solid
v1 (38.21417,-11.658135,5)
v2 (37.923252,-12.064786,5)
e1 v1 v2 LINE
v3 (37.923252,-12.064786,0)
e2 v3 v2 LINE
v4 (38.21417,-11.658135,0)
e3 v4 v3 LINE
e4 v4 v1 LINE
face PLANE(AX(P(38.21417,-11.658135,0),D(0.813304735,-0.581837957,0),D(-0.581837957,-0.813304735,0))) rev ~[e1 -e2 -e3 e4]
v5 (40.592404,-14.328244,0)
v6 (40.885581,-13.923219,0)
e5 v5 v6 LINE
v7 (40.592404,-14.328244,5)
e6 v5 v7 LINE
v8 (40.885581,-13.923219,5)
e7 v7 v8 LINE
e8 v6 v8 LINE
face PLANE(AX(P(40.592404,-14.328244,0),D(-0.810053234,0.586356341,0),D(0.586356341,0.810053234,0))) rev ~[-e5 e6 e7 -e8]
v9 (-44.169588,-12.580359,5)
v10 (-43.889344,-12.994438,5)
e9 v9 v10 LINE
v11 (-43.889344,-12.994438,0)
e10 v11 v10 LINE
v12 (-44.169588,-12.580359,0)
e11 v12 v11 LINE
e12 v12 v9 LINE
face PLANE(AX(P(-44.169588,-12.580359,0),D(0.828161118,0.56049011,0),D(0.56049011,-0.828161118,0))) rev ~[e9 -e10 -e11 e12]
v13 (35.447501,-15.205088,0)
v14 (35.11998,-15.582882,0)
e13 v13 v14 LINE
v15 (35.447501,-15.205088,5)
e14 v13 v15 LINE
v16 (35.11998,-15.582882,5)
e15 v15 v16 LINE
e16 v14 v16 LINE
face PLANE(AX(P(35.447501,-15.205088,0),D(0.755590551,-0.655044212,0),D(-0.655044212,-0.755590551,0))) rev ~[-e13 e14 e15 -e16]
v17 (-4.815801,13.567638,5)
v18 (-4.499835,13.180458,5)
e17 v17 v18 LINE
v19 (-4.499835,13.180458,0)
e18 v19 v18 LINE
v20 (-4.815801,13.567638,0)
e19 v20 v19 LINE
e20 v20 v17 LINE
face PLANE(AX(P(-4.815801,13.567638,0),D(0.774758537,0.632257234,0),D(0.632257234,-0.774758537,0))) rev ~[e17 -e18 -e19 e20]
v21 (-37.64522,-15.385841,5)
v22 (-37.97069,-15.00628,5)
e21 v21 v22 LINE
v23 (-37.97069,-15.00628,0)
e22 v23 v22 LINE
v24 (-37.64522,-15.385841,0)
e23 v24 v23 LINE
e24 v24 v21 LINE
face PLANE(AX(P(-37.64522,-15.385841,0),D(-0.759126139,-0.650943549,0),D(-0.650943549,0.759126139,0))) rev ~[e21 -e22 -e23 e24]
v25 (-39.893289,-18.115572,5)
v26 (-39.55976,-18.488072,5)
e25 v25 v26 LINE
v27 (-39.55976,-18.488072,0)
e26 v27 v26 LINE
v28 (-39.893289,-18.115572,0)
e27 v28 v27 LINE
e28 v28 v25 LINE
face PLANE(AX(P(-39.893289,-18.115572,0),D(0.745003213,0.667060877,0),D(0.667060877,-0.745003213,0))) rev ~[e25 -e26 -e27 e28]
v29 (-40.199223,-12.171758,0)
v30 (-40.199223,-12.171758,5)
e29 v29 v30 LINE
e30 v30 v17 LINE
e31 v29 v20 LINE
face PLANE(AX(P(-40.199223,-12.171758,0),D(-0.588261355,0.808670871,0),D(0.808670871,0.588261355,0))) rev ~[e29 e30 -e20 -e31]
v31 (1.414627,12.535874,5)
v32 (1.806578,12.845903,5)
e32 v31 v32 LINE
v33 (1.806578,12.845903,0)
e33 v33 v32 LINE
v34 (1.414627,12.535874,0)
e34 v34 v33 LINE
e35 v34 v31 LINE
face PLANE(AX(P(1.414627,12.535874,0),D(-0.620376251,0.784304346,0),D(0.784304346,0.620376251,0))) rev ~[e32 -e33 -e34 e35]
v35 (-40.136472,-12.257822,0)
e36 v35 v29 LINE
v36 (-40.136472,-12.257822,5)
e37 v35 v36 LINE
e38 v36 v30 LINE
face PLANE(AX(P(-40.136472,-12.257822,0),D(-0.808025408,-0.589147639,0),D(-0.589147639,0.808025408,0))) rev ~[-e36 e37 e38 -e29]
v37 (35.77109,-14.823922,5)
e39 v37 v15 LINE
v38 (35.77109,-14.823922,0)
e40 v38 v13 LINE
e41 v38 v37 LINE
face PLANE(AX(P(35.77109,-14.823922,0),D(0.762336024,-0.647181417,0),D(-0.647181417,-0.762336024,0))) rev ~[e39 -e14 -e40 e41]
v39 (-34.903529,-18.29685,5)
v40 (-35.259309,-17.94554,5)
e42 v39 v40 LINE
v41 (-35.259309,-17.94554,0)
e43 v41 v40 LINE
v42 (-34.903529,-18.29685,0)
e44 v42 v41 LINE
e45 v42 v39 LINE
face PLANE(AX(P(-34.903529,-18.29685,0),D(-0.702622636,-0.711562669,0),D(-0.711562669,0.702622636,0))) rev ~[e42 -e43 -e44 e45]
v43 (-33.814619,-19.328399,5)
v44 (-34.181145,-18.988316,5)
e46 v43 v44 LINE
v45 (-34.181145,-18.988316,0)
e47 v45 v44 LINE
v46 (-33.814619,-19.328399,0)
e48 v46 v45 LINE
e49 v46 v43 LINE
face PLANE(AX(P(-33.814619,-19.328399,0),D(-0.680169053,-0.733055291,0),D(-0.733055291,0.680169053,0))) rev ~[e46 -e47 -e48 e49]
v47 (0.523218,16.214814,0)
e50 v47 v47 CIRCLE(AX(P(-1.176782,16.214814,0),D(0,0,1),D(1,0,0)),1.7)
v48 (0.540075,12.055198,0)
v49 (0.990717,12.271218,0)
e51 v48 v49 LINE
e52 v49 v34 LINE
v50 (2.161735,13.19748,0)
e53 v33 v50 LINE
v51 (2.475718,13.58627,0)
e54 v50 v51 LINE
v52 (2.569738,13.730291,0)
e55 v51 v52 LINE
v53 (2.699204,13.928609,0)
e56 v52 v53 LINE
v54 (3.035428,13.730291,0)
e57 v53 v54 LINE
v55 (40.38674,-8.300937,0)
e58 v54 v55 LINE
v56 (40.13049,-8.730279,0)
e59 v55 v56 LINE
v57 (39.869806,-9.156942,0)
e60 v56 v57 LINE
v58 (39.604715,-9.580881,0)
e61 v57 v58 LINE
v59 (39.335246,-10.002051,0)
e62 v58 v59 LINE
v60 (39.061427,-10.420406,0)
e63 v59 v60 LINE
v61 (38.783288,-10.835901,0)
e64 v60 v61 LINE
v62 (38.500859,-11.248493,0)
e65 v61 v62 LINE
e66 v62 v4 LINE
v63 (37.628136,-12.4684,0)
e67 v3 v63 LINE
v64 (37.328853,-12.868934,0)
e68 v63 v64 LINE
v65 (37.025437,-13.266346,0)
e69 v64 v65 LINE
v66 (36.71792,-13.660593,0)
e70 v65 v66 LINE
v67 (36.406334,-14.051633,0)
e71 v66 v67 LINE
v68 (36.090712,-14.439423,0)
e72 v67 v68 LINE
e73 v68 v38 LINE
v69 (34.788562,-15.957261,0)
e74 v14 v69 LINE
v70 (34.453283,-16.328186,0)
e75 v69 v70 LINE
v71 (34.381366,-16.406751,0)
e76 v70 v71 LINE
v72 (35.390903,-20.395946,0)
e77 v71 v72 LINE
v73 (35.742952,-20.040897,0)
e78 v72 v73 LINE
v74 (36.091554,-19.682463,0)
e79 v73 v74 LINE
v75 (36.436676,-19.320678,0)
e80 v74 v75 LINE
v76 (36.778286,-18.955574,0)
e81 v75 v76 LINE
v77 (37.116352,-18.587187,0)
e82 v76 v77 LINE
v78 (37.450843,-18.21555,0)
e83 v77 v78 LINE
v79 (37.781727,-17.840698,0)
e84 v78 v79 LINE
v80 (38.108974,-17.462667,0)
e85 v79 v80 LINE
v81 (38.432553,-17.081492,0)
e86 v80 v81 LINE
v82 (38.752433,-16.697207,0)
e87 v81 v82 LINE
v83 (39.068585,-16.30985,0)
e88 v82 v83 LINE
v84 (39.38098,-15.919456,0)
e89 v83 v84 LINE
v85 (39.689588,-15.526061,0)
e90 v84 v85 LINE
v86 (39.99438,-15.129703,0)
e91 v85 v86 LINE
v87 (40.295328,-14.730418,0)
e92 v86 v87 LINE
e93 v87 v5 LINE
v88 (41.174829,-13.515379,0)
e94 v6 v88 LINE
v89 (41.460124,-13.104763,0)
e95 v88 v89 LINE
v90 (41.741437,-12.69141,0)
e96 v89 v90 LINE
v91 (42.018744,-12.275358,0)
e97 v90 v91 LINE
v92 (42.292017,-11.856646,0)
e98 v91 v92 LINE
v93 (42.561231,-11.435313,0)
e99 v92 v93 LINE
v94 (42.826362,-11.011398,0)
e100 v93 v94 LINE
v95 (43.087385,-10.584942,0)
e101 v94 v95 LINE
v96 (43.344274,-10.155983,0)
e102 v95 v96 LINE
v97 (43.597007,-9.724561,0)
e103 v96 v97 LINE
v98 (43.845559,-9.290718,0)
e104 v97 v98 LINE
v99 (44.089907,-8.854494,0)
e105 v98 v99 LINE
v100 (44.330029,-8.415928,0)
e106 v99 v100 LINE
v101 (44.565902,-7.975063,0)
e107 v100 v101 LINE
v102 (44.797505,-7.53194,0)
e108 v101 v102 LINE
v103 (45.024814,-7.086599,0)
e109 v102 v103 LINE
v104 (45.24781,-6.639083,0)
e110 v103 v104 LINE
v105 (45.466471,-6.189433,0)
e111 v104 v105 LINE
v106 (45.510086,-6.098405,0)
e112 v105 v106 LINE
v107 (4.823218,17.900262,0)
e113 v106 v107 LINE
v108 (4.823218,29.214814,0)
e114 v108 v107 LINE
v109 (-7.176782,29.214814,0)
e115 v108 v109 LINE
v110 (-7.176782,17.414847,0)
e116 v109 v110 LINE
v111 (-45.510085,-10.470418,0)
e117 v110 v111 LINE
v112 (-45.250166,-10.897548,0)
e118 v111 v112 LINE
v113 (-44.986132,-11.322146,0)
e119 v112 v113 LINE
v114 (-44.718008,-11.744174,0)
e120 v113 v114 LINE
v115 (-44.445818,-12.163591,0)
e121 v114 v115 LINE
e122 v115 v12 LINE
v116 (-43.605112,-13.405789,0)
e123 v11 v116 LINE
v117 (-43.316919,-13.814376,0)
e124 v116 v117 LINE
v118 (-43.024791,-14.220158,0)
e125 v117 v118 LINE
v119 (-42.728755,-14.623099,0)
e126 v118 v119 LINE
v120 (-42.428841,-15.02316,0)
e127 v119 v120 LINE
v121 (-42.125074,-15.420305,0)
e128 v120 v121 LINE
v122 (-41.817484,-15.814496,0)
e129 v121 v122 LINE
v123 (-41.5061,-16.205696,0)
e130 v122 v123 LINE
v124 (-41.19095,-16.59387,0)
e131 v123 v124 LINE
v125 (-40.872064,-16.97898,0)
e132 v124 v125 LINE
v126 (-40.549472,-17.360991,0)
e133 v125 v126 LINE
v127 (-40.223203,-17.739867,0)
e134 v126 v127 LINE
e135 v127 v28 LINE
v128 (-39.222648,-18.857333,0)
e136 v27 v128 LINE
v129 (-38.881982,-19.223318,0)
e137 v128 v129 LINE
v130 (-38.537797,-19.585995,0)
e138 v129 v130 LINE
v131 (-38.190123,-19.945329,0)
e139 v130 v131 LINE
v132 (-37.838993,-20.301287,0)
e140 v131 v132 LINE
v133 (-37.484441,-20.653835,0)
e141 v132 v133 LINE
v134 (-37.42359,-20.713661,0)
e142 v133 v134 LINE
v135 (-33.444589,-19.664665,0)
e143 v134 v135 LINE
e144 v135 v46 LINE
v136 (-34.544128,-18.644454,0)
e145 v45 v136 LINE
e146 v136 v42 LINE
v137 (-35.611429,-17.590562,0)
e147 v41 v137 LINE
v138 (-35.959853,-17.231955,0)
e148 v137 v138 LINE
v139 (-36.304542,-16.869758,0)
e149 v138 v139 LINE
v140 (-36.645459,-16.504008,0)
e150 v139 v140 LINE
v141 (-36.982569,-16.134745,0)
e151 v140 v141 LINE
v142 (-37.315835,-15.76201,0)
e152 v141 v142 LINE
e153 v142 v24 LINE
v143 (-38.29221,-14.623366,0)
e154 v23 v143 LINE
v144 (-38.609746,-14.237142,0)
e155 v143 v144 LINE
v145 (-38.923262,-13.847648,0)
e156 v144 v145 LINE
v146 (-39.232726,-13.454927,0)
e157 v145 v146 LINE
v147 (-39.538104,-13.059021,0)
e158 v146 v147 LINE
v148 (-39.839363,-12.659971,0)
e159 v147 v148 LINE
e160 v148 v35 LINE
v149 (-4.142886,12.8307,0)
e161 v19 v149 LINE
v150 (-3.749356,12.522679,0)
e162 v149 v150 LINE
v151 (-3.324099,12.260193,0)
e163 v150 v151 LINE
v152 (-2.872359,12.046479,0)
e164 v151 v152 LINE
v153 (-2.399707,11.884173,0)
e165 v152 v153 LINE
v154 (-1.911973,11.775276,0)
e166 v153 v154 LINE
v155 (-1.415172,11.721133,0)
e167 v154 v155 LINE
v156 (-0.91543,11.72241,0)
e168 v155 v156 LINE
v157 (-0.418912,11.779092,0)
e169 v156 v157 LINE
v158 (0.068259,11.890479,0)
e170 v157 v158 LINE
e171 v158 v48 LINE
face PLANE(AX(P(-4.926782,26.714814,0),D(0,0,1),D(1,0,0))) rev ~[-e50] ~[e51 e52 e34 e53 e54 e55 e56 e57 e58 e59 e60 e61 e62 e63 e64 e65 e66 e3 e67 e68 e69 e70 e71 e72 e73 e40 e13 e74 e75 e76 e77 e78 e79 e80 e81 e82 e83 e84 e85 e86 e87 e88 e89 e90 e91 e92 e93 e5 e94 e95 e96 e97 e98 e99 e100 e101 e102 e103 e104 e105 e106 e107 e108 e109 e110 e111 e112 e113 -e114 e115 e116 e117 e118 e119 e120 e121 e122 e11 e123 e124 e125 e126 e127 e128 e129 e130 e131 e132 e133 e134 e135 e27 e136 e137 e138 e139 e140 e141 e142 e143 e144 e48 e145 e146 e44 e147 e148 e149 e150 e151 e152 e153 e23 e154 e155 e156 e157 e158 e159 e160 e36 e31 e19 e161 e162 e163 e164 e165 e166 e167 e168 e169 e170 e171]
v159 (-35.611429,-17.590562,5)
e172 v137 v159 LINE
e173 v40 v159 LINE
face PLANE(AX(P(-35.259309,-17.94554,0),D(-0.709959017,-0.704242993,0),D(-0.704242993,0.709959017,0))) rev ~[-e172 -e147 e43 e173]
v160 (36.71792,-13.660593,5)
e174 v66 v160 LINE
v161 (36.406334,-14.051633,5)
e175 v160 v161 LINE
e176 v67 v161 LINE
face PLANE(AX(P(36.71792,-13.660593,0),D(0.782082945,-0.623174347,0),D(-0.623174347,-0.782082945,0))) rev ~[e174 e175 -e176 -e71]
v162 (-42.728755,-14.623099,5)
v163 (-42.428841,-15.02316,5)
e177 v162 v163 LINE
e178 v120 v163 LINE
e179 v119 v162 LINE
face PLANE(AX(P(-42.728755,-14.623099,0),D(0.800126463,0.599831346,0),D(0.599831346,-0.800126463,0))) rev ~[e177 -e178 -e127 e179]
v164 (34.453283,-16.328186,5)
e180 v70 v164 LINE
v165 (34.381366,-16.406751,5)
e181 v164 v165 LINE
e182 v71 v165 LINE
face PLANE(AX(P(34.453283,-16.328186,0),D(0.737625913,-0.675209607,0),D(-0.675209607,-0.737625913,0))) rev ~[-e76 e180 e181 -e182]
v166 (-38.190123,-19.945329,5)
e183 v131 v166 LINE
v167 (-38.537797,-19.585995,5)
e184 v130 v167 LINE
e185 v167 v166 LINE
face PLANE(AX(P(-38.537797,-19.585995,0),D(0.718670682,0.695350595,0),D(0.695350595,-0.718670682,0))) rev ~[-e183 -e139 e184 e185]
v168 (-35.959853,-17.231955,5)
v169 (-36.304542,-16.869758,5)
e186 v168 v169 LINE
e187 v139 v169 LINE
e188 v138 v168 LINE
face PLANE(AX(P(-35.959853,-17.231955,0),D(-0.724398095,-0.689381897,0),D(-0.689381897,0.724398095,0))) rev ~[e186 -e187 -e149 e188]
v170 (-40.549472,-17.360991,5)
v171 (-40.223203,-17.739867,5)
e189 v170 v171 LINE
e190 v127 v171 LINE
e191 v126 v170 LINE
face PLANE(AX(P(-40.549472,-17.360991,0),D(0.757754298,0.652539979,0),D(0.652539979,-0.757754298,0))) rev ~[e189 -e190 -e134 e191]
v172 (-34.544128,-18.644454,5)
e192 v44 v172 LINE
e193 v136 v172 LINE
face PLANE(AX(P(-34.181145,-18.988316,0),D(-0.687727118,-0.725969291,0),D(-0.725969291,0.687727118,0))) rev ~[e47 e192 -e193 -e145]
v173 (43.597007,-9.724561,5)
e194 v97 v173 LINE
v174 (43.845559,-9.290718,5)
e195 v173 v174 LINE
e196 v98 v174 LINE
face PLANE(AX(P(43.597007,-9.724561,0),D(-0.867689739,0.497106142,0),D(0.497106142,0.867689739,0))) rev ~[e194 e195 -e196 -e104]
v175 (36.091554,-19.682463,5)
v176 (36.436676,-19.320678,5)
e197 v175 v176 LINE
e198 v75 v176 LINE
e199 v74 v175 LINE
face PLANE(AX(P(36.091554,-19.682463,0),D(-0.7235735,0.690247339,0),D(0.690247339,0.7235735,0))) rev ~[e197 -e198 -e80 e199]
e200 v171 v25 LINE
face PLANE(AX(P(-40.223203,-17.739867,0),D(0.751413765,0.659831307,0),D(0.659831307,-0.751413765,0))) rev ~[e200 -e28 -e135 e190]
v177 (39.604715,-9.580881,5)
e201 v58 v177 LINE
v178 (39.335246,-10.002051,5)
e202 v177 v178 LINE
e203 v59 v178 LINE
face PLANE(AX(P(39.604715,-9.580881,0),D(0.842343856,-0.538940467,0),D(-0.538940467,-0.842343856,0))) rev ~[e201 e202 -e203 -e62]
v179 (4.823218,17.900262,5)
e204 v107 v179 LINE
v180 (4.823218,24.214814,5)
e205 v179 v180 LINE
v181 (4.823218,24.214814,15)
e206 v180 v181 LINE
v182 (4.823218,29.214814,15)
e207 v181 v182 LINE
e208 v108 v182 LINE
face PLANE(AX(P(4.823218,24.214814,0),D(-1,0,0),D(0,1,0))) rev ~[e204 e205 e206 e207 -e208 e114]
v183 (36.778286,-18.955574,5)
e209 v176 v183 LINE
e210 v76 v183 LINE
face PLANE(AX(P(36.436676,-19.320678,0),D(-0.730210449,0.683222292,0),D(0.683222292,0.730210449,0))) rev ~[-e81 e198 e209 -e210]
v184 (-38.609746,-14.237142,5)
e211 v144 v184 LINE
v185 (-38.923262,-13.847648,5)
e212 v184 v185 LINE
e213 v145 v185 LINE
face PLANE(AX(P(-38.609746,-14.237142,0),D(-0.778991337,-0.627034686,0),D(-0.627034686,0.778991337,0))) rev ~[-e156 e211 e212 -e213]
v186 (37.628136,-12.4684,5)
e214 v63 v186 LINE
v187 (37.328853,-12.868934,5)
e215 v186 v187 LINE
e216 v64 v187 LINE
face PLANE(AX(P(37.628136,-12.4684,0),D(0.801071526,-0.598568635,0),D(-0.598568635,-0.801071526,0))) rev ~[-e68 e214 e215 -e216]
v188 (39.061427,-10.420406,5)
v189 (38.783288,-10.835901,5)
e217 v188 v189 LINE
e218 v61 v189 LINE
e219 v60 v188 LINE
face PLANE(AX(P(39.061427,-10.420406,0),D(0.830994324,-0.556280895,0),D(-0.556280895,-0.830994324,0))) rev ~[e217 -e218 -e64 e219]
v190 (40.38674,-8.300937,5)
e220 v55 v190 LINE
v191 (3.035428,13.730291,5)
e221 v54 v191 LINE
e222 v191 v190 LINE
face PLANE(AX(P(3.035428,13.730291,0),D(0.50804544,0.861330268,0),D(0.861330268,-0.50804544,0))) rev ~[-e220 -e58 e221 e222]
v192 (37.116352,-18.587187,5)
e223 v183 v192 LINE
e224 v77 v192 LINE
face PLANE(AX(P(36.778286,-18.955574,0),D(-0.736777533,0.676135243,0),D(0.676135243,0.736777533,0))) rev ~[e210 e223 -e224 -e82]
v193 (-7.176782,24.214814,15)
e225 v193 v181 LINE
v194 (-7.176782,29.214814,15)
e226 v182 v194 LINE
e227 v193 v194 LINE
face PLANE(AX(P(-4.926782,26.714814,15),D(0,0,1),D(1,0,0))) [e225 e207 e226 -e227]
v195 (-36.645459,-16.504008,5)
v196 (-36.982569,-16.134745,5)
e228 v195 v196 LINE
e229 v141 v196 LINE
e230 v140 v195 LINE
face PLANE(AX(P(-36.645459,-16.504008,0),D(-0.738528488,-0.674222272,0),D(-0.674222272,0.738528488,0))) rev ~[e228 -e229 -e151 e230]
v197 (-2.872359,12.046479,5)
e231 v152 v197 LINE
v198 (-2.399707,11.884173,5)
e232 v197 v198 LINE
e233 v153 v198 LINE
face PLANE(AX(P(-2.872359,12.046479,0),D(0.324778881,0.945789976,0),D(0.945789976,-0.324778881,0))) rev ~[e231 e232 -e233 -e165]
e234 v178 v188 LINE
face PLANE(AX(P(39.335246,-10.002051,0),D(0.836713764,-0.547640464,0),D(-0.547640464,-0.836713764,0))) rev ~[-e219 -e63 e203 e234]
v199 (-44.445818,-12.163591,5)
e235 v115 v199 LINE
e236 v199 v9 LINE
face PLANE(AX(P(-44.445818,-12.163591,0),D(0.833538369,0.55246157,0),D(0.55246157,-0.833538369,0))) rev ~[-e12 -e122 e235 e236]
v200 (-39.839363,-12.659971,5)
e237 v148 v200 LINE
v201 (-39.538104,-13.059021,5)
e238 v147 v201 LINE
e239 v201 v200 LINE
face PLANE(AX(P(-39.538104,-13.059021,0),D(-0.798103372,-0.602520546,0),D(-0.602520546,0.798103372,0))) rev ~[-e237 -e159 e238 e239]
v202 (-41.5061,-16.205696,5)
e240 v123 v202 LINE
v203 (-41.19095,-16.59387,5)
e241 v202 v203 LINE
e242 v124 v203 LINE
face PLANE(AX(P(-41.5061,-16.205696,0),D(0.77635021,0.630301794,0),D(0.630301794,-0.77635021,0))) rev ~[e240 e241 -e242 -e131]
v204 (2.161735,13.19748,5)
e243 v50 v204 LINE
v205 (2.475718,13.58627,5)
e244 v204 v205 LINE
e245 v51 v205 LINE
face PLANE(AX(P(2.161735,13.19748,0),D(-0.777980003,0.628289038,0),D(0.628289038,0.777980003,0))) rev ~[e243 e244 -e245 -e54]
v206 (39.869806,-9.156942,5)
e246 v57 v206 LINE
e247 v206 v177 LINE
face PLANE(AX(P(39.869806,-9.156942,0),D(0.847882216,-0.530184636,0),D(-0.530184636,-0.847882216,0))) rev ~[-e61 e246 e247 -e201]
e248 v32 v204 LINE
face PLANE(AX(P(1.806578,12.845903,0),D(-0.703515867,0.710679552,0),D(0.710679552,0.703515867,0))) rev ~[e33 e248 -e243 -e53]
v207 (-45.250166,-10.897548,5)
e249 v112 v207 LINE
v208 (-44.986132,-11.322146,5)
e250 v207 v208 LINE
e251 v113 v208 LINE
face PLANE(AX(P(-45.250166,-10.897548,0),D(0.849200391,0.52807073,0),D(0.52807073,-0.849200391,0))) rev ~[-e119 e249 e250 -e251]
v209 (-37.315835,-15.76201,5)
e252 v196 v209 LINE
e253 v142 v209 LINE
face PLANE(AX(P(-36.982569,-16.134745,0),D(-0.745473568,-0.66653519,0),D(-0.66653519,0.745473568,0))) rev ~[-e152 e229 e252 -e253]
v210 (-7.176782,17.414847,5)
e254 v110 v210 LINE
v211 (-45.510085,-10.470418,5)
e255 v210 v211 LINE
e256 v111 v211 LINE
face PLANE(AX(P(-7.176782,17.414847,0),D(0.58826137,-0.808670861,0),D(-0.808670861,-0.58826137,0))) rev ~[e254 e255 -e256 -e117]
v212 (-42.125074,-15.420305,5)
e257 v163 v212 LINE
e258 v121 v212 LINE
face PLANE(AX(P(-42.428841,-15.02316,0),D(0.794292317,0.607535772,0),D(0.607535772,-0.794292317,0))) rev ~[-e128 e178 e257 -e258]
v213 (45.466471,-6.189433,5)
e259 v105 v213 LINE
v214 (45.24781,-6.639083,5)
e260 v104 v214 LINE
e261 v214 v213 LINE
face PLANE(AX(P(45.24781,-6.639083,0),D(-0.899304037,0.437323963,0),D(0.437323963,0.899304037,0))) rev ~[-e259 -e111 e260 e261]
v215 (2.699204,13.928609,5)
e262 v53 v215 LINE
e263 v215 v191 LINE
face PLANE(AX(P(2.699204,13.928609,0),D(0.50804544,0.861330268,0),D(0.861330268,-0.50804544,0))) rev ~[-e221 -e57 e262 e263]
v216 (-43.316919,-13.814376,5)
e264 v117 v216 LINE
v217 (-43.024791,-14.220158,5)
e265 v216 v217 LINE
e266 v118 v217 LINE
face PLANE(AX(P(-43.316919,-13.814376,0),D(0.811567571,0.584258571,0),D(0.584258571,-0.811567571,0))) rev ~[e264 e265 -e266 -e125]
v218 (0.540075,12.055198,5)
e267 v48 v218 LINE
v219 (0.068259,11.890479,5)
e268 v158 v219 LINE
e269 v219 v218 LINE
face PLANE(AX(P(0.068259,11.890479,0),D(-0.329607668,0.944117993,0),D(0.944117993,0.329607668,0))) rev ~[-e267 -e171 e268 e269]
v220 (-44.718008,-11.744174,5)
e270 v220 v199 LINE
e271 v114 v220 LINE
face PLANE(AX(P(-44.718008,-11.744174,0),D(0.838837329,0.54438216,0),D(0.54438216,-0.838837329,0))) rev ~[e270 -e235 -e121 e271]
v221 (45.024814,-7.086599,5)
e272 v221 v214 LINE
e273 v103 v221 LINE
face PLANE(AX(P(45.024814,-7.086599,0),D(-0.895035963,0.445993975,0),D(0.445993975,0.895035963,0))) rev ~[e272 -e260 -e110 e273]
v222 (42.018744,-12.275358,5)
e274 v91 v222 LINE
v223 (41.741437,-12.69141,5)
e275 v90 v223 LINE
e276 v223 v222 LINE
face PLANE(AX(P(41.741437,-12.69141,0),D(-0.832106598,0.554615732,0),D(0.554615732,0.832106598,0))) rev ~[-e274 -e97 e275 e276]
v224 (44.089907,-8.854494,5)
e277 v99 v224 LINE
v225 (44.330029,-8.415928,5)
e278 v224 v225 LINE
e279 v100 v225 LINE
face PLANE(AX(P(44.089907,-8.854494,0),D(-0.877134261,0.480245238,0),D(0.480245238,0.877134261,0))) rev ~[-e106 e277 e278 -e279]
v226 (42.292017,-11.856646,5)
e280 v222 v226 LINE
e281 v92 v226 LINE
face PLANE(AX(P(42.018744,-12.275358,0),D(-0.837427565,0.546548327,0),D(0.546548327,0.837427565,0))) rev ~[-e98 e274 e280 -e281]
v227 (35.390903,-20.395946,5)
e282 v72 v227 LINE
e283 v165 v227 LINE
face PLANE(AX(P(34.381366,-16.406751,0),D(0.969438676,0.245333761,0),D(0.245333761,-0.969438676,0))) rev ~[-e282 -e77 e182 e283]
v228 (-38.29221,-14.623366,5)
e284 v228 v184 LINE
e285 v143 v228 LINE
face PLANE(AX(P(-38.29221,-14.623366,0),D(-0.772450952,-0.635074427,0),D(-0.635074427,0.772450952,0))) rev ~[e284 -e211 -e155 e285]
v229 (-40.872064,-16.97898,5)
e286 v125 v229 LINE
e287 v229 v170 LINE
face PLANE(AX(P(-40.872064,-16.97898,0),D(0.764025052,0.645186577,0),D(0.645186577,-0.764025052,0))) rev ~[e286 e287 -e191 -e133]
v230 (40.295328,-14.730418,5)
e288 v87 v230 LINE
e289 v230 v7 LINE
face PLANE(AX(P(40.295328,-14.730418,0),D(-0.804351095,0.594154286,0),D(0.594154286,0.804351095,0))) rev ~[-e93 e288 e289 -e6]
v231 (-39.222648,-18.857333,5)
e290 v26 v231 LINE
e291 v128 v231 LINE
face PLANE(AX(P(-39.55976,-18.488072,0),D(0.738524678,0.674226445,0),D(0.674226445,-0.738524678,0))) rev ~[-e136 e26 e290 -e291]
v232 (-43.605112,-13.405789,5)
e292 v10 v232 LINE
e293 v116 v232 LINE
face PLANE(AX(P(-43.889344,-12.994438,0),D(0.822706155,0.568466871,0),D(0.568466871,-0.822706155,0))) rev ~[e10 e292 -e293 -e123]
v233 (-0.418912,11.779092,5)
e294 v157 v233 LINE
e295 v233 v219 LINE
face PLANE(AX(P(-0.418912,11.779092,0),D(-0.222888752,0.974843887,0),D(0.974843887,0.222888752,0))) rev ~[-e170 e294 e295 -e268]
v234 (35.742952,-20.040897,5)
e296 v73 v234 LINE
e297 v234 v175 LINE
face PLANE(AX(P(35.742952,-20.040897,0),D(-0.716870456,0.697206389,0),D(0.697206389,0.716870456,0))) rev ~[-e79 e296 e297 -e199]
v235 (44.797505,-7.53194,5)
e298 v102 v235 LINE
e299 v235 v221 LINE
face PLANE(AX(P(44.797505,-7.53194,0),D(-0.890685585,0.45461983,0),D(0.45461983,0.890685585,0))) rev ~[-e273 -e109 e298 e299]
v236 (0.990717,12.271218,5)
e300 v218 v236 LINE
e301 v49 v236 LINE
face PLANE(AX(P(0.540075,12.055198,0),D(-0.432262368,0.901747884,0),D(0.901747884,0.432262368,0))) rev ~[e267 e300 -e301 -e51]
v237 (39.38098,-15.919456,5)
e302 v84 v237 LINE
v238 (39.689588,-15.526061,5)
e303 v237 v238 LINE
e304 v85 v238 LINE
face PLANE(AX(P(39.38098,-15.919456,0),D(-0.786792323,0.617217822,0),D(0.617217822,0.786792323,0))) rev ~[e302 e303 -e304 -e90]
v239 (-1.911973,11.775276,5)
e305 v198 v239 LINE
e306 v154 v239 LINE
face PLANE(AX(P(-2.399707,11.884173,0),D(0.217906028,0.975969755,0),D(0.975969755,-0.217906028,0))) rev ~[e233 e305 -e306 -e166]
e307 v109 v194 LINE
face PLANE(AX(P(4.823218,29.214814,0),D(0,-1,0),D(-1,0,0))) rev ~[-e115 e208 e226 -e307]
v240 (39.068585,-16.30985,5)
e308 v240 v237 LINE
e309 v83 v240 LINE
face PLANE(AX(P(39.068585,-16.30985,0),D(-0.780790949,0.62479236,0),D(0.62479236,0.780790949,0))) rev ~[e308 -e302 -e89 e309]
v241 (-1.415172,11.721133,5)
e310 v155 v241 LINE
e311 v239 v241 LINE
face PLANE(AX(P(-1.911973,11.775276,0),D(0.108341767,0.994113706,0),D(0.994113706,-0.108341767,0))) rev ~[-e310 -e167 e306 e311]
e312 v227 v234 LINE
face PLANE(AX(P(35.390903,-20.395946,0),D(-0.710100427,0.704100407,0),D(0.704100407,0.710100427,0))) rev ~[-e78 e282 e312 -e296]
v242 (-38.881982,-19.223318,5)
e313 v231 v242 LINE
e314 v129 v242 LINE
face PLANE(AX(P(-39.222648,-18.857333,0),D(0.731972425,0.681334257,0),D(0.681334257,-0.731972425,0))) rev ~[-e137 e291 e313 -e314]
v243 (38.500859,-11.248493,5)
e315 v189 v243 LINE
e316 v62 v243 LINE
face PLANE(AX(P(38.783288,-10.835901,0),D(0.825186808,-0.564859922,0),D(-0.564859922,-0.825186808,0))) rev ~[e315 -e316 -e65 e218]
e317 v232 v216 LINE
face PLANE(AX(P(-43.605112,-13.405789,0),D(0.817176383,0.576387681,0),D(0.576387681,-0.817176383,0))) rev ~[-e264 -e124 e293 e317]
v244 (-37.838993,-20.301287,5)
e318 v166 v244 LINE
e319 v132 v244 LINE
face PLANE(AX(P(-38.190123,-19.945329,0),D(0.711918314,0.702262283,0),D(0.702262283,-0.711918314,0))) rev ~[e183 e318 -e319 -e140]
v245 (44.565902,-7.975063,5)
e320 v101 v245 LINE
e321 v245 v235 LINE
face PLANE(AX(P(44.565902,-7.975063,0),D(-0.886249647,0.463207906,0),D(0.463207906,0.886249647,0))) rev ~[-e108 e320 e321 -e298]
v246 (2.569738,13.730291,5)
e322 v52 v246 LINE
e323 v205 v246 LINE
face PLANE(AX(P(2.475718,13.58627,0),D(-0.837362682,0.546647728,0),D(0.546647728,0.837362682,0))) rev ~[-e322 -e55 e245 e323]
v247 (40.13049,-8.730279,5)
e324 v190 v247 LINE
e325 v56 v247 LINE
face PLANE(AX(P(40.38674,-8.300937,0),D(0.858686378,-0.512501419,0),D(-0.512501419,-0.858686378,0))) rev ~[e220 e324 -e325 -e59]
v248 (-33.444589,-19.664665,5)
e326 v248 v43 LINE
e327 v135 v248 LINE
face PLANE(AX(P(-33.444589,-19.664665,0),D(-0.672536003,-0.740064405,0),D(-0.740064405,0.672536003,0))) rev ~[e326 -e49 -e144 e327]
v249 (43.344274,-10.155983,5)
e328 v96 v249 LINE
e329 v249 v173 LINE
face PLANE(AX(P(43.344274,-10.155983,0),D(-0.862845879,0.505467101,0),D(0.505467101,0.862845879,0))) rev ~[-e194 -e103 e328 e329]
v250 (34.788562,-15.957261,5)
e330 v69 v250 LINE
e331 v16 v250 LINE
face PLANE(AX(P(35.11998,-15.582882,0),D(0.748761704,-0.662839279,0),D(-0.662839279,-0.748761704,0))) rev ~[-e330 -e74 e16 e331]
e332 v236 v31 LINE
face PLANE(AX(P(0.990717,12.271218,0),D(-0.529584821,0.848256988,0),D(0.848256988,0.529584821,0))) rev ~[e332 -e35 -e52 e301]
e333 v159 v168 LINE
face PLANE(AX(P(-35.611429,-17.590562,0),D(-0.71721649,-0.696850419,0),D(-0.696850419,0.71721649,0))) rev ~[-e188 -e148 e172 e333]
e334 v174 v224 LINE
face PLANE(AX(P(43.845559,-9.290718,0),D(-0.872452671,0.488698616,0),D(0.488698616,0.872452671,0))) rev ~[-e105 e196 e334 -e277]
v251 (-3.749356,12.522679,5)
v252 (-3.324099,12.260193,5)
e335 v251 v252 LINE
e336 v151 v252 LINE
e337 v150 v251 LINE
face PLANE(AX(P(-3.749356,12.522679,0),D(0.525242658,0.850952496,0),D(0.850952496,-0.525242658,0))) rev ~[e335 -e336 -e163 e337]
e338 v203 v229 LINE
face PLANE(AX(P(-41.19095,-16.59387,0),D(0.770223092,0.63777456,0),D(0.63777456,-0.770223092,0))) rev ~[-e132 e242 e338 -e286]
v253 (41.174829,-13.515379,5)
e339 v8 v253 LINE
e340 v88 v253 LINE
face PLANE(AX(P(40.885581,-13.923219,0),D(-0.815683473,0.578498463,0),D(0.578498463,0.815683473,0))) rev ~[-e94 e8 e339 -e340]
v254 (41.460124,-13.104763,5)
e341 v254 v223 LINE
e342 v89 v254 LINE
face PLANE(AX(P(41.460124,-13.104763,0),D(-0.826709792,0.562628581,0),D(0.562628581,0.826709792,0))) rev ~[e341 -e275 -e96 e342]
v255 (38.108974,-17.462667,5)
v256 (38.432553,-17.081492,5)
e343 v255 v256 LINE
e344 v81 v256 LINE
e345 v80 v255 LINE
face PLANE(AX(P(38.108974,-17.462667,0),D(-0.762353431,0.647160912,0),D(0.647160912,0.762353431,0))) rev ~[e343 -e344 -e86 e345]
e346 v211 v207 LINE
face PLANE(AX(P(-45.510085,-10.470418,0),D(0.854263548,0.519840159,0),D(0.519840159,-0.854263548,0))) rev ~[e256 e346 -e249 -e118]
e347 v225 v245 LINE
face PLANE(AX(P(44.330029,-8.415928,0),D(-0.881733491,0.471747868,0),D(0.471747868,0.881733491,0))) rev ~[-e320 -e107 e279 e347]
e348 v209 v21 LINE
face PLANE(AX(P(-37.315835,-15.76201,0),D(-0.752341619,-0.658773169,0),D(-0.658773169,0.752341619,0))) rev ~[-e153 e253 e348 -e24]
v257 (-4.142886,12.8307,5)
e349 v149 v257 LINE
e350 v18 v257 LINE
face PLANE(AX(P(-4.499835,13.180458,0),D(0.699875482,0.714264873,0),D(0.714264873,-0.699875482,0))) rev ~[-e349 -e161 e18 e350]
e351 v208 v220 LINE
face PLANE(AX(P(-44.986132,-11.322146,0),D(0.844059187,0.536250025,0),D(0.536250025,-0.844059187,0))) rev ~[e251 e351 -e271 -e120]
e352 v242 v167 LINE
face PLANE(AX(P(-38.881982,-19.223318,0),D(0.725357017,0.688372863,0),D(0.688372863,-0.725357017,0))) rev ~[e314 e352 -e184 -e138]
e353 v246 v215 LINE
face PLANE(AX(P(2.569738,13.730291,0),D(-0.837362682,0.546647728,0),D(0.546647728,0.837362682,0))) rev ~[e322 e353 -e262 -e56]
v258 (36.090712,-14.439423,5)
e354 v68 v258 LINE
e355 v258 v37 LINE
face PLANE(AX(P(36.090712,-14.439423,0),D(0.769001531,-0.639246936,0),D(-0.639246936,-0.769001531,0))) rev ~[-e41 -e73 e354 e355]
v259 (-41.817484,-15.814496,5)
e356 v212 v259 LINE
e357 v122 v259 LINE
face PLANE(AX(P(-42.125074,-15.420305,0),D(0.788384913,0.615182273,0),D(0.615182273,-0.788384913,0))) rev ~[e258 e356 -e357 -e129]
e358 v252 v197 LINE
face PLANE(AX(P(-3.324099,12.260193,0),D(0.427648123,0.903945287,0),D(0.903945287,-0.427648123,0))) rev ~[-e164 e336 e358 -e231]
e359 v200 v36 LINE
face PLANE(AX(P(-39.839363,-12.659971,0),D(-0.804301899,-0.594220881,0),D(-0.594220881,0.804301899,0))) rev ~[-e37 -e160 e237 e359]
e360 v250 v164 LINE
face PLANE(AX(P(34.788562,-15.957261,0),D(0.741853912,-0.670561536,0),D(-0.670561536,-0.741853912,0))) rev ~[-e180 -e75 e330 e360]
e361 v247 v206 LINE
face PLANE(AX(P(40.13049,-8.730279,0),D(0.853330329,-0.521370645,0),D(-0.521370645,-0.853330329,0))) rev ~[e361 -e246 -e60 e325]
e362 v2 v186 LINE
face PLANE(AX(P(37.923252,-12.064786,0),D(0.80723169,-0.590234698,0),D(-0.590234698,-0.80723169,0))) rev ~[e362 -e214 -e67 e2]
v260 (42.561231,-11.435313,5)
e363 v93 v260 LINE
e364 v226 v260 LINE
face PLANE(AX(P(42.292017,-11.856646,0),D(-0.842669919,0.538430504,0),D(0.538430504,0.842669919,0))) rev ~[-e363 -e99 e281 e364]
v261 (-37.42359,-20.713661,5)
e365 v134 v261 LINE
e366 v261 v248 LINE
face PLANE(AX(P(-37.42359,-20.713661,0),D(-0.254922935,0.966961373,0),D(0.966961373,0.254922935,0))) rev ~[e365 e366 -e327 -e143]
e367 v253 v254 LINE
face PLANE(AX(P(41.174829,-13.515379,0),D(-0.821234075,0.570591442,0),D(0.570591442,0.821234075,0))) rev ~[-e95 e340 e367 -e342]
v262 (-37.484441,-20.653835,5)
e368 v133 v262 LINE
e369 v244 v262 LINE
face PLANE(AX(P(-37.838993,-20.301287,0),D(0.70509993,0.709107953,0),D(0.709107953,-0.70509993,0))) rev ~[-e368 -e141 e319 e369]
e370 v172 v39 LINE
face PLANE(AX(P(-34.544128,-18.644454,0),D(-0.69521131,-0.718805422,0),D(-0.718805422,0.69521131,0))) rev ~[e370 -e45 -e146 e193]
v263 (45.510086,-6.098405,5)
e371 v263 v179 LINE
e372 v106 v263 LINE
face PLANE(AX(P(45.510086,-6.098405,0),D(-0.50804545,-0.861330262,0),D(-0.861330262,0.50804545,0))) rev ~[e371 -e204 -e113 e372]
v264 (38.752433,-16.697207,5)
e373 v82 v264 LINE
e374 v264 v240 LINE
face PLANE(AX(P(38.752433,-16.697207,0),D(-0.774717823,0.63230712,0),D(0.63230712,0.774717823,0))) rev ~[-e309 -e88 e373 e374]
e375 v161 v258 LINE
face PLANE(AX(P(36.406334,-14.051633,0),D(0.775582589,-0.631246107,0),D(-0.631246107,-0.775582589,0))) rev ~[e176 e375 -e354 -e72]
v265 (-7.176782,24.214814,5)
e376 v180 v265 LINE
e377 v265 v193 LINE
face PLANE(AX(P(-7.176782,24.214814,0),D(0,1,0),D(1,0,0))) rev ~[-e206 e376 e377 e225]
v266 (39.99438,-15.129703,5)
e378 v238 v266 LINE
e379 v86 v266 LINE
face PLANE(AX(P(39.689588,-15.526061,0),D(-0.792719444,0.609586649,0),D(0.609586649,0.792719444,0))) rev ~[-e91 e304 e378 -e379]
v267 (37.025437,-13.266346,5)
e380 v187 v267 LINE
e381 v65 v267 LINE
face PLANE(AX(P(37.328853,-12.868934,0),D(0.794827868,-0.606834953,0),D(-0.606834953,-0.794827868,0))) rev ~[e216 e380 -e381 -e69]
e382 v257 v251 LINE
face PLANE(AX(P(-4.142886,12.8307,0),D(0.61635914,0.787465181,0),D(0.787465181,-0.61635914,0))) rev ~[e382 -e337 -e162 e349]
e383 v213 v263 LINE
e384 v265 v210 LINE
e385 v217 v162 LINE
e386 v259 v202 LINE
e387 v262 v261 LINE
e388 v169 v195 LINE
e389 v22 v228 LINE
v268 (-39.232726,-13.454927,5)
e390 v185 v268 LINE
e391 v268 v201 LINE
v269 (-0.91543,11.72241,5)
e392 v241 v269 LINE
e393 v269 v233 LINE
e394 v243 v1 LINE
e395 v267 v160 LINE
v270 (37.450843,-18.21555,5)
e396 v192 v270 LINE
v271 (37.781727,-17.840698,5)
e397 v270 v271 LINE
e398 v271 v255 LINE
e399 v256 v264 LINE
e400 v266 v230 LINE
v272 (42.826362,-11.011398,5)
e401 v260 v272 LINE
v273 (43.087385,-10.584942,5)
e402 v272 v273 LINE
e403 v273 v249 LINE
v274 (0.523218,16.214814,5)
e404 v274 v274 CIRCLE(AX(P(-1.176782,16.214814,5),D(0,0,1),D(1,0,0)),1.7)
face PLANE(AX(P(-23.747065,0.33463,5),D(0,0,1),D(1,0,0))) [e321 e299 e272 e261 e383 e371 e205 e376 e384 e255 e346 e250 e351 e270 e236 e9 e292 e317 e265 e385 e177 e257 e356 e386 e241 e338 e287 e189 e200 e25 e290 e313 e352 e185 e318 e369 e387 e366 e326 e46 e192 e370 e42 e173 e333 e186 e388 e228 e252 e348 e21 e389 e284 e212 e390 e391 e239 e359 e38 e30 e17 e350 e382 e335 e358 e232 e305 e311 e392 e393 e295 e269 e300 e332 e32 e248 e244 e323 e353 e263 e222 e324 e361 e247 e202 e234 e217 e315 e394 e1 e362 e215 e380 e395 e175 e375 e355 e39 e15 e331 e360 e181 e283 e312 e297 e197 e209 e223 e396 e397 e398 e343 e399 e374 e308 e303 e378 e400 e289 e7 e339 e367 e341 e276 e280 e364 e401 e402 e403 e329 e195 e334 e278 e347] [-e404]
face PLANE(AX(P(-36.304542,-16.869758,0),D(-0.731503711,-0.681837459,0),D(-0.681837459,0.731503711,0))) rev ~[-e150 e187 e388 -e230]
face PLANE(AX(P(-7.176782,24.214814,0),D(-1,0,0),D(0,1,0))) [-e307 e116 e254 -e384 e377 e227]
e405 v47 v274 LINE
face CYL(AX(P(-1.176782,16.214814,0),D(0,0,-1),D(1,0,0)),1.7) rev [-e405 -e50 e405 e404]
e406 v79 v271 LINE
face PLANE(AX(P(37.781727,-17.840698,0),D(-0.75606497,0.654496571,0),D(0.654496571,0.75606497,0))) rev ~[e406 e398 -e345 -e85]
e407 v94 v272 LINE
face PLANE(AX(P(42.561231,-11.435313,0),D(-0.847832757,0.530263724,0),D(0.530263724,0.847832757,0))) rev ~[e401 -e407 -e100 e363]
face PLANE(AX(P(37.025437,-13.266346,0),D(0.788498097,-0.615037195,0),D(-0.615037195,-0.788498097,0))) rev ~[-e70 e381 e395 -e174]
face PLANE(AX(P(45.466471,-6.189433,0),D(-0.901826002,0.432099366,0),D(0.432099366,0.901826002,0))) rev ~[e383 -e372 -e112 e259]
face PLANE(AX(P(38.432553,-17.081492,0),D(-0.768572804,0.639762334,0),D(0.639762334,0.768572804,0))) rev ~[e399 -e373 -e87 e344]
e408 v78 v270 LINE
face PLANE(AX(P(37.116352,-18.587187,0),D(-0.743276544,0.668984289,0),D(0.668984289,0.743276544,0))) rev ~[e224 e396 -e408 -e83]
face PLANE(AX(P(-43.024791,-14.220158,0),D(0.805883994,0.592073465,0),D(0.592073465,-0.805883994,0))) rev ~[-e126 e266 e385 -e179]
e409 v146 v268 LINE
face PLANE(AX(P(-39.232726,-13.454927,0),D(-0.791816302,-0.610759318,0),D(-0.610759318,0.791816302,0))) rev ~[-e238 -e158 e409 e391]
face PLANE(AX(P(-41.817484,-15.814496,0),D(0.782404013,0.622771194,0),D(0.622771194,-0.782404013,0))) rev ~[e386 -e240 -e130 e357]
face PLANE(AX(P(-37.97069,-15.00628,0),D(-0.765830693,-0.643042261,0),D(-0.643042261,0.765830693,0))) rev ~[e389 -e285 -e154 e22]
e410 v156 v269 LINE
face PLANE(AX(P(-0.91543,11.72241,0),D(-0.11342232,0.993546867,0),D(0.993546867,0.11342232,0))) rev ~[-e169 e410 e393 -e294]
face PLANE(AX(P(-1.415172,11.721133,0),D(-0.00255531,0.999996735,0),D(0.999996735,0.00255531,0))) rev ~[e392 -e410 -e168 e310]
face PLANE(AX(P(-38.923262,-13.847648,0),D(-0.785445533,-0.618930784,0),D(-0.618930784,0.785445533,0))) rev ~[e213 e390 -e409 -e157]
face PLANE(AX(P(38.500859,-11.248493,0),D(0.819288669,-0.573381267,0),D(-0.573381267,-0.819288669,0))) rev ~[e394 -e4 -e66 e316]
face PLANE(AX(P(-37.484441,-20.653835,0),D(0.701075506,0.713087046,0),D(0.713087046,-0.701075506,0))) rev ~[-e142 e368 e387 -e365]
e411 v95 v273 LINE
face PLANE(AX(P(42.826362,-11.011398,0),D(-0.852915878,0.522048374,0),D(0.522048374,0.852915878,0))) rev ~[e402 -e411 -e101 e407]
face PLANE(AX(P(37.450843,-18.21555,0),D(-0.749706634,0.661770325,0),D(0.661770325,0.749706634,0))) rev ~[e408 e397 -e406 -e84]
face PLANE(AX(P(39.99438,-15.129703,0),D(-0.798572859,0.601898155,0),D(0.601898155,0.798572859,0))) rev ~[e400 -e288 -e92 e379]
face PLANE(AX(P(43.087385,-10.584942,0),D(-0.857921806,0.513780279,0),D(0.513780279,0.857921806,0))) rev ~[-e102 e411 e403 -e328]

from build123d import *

# Parameters (mm, degrees)
F0_R     = 1.7
F1_DEPTH = 5
F0_W     = 4.5
F0_H     = 5
F0_W_2   = 3
F2_DEPTH = 15


# Not quite as in the source:
# - a feature names something its author has since deleted; it is built from what else it names


with BuildPart() as f1:
    # F0 (on Top) → F1 (new body)
    with BuildSketch(Plane.XY):
        with BuildLine():
            Line((-37.42359, -20.713661), (-33.444589, -19.664665))
            Line((-33.444589, -19.664665), (-33.814619, -19.328399))
            Line((-33.814619, -19.328399), (-34.181145, -18.988316))
            Line((-34.181145, -18.988316), (-34.544128, -18.644454))
            Line((-34.544128, -18.644454), (-34.903529, -18.29685))
            Line((-34.903529, -18.29685), (-35.259309, -17.94554))
            Line((-35.259309, -17.94554), (-35.611429, -17.590562))
            Line((-35.611429, -17.590562), (-35.959853, -17.231955))
            Line((-35.959853, -17.231955), (-36.304542, -16.869758))
            Line((-36.304542, -16.869758), (-36.645459, -16.504008))
            Line((-36.645459, -16.504008), (-36.982569, -16.134745))
            Line((-36.982569, -16.134745), (-37.315835, -15.76201))
            Line((-37.315835, -15.76201), (-37.64522, -15.385841))
            Line((-37.64522, -15.385841), (-37.97069, -15.00628))
            Line((-37.97069, -15.00628), (-38.29221, -14.623366))
            Line((-38.29221, -14.623366), (-38.609746, -14.237142))
            Line((-38.609746, -14.237142), (-38.923262, -13.847648))
            Line((-38.923262, -13.847648), (-39.232726, -13.454927))
            Line((-39.232726, -13.454927), (-39.538104, -13.059021))
            Line((-39.538104, -13.059021), (-39.839363, -12.659971))
            Line((-39.839363, -12.659971), (-40.136472, -12.257822))
            Line((-40.136472, -12.257822), (-40.199223, -12.171758))
            Line((-40.199223, -12.171758), (-4.815801, 13.567638))
            Line((-4.815801, 13.567638), (-4.499835, 13.180458))
            Line((-4.499835, 13.180458), (-4.142886, 12.8307))
            Line((-4.142886, 12.8307), (-3.749356, 12.522679))
            Line((-3.749356, 12.522679), (-3.324099, 12.260193))
            Line((-3.324099, 12.260193), (-2.872359, 12.046479))
            Line((-2.872359, 12.046479), (-2.399707, 11.884173))
            Line((-2.399707, 11.884173), (-1.911973, 11.775276))
            Line((-1.911973, 11.775276), (-1.415172, 11.721133))
            Line((-1.415172, 11.721133), (-0.91543, 11.72241))
            Line((-0.91543, 11.72241), (-0.418912, 11.779092))
            Line((-0.418912, 11.779092), (0.068259, 11.890479))
            Line((0.068259, 11.890479), (0.540075, 12.055198))
            Line((0.540075, 12.055198), (0.990717, 12.271218))
            Line((0.990717, 12.271218), (1.414627, 12.535874))
            Line((1.414627, 12.535874), (1.806578, 12.845903))
            Line((1.806578, 12.845903), (2.161735, 13.19748))
            Line((2.161735, 13.19748), (2.475718, 13.58627))
            Line((2.475718, 13.58627), (2.5697381369, 13.7302913689))
            Line((2.5697381369, 13.7302913689), (1.9580461126, 13.7302913689))
            ThreePointArc((1.9580461126, 13.7302913689), (-1.176782, 12.214814), (-4.3116101126, 13.7302913689))
            Line((-4.3116101126, 13.7302913689), (-7.176782, 13.7302913689))
            Line((-7.176782, 13.7302913689), (-7.176782, 17.4148470867))
            Line((-7.176782, 17.4148470867), (-45.510085, -10.470418))
            Line((-45.510085, -10.470418), (-45.250166, -10.897548))
            Line((-45.250166, -10.897548), (-44.986132, -11.322146))
            Line((-44.986132, -11.322146), (-44.718008, -11.744174))
            Line((-44.718008, -11.744174), (-44.445818, -12.163591))
            Line((-44.445818, -12.163591), (-44.169588, -12.580359))
            Line((-44.169588, -12.580359), (-43.889344, -12.994438))
            Line((-43.889344, -12.994438), (-43.605112, -13.405789))
            Line((-43.605112, -13.405789), (-43.316919, -13.814376))
            Line((-43.316919, -13.814376), (-43.024791, -14.220158))
            Line((-43.024791, -14.220158), (-42.728755, -14.623099))
            Line((-42.728755, -14.623099), (-42.428841, -15.02316))
            Line((-42.428841, -15.02316), (-42.125074, -15.420305))
            Line((-42.125074, -15.420305), (-41.817484, -15.814496))
            Line((-41.817484, -15.814496), (-41.5061, -16.205696))
            Line((-41.5061, -16.205696), (-41.19095, -16.59387))
            Line((-41.19095, -16.59387), (-40.872064, -16.97898))
            Line((-40.872064, -16.97898), (-40.549472, -17.360991))
            Line((-40.549472, -17.360991), (-40.223203, -17.739867))
            Line((-40.223203, -17.739867), (-39.893289, -18.115572))
            Line((-39.893289, -18.115572), (-39.55976, -18.488072))
            Line((-39.55976, -18.488072), (-39.222648, -18.857333))
            Line((-39.222648, -18.857333), (-38.881982, -19.223318))
            Line((-38.881982, -19.223318), (-38.537797, -19.585995))
            Line((-38.537797, -19.585995), (-38.190123, -19.945329))
            Line((-38.190123, -19.945329), (-37.838993, -20.301287))
            Line((-37.838993, -20.301287), (-37.484441, -20.653835))
            Line((-37.484441, -20.653835), (-37.42359, -20.713661))
        make_face()
        with BuildLine():
            Line((-3.823958, 19.853833), (-7.176782, 17.4148470867))
            Line((-7.176782, 17.4148470867), (-7.176782, 13.7302913689))
            Line((-7.176782, 13.7302913689), (-4.3116101126, 13.7302913689))
            ThreePointArc((-4.3116101126, 13.7302913689), (-2.4922073209, 19.9923338511), (2.823218, 16.214814))
            ThreePointArc((2.823218, 16.214814), (2.6007378511, 14.8993886791), (1.9580461126, 13.7302913689))
            Line((1.9580461126, 13.7302913689), (2.5697381369, 13.7302913689))
            Line((2.5697381369, 13.7302913689), (2.699204, 13.928609))
            Line((2.699204, 13.928609), (3.0354278194, 13.7302913689))
            Line((3.0354278194, 13.7302913689), (4.823218, 13.7302913689))
            Line((4.823218, 13.7302913689), (4.823218, 17.9002620213))
            Line((4.823218, 17.9002620213), (1.109423, 20.0908))
            Line((1.109423, 20.0908), (0.665545, 20.320399))
            Line((0.665545, 20.320399), (0.198946, 20.499364))
            Line((0.198946, 20.499364), (-0.284619, 20.625488))
            Line((-0.284619, 20.625488), (-0.779188, 20.697215))
            Line((-0.779188, 20.697215), (-1.27866, 20.713661))
            Line((-1.27866, 20.713661), (-1.776876, 20.674622))
            Line((-1.776876, 20.674622), (-2.267691, 20.580581))
            Line((-2.267691, 20.580581), (-2.745051, 20.432696))
            Line((-2.745051, 20.432696), (-3.20307, 20.232793))
            Line((-3.20307, 20.232793), (-3.636099, 19.983336))
            Line((-3.636099, 19.983336), (-3.823958, 19.853833))
        make_face()
        Polygon((4.823218, 13.7302913689), (3.0354278194, 13.7302913689), (40.38674, -8.300937), (40.13049, -8.730279), (39.869806, -9.156942), (39.604715, -9.580881), (39.335246, -10.002051), (39.061427, -10.420406), (38.783288, -10.835901), (38.500859, -11.248493), (38.21417, -11.658135), (37.923252, -12.064786), (37.628136, -12.4684), (37.328853, -12.868934), (37.025437, -13.266346), (36.71792, -13.660593), (36.406334, -14.051633), (36.090712, -14.439423), (35.77109, -14.823922), (35.447501, -15.205088), (35.11998, -15.582882), (34.788562, -15.957261), (34.453283, -16.328186), (34.381366, -16.406751), (35.390903, -20.395946), (35.742952, -20.040897), (36.091554, -19.682463), (36.436676, -19.320678), (36.778286, -18.955574), (37.116352, -18.587187), (37.450843, -18.21555), (37.781727, -17.840698), (38.108974, -17.462667), (38.432553, -17.081492), (38.752433, -16.697207), (39.068585, -16.30985), (39.38098, -15.919456), (39.689588, -15.526061), (39.99438, -15.129703), (40.295328, -14.730418), (40.592404, -14.328244), (40.885581, -13.923219), (41.174829, -13.515379), (41.460124, -13.104763), (41.741437, -12.69141), (42.018744, -12.275358), (42.292017, -11.856646), (42.561231, -11.435313), (42.826362, -11.011398), (43.087385, -10.584942), (43.344274, -10.155983), (43.597007, -9.724561), (43.845559, -9.290718), (44.089907, -8.854494), (44.330029, -8.415928), (44.565902, -7.975063), (44.797505, -7.53194), (45.024814, -7.086599), (45.24781, -6.639083), (45.466471, -6.189433), (45.510086, -6.098405), (4.823218, 17.9002620213), align=None)
        Polygon((-7.176782, 24.214814), (-7.176782, 17.4148470867), (-3.823958, 19.853833), (-3.636099, 19.983336), (-3.20307, 20.232793), (-2.745051, 20.432696), (-2.267691, 20.580581), (-1.776876, 20.674622), (-1.27866, 20.713661), (-0.779188, 20.697215), (-0.284619, 20.625488), (0.198946, 20.499364), (0.665545, 20.320399), (1.109423, 20.0908), (4.823218, 17.9002620213), (4.823218, 24.214814), (0.323218, 24.214814), (-2.676782, 24.214814), align=None)
        with BuildLine():
            ThreePointArc((2.823218, 16.214814), (-2.4922073209, 19.9923338511), (-4.3116101126, 13.7302913689))
            Line((-4.3116101126, 13.7302913689), (1.9580461126, 13.7302913689))
            ThreePointArc((1.9580461126, 13.7302913689), (2.6007378511, 14.8993886791), (2.823218, 16.214814))
        make_face()
        with Locations((-1.176782, 16.214814)):
            Circle(F0_R, mode=Mode.SUBTRACT)
        with BuildLine():
            Line((1.9580461126, 13.7302913689), (-4.3116101126, 13.7302913689))
            ThreePointArc((-4.3116101126, 13.7302913689), (-1.176782, 12.214814), (1.9580461126, 13.7302913689))
        make_face()
    extrude(amount=F1_DEPTH)

    # F0 (on Top) → F2 (join)
    with BuildSketch(Plane.XY):
        with Locations((-4.926782, 26.714814)):
            Rectangle(F0_W, F0_H)
        with Locations((2.573218, 26.714814)):
            Rectangle(F0_W, F0_H)
        with Locations((-1.176782, 26.714814)):
            Rectangle(F0_W_2, F0_H)
    extrude(amount=F2_DEPTH)


solid = f1.part
